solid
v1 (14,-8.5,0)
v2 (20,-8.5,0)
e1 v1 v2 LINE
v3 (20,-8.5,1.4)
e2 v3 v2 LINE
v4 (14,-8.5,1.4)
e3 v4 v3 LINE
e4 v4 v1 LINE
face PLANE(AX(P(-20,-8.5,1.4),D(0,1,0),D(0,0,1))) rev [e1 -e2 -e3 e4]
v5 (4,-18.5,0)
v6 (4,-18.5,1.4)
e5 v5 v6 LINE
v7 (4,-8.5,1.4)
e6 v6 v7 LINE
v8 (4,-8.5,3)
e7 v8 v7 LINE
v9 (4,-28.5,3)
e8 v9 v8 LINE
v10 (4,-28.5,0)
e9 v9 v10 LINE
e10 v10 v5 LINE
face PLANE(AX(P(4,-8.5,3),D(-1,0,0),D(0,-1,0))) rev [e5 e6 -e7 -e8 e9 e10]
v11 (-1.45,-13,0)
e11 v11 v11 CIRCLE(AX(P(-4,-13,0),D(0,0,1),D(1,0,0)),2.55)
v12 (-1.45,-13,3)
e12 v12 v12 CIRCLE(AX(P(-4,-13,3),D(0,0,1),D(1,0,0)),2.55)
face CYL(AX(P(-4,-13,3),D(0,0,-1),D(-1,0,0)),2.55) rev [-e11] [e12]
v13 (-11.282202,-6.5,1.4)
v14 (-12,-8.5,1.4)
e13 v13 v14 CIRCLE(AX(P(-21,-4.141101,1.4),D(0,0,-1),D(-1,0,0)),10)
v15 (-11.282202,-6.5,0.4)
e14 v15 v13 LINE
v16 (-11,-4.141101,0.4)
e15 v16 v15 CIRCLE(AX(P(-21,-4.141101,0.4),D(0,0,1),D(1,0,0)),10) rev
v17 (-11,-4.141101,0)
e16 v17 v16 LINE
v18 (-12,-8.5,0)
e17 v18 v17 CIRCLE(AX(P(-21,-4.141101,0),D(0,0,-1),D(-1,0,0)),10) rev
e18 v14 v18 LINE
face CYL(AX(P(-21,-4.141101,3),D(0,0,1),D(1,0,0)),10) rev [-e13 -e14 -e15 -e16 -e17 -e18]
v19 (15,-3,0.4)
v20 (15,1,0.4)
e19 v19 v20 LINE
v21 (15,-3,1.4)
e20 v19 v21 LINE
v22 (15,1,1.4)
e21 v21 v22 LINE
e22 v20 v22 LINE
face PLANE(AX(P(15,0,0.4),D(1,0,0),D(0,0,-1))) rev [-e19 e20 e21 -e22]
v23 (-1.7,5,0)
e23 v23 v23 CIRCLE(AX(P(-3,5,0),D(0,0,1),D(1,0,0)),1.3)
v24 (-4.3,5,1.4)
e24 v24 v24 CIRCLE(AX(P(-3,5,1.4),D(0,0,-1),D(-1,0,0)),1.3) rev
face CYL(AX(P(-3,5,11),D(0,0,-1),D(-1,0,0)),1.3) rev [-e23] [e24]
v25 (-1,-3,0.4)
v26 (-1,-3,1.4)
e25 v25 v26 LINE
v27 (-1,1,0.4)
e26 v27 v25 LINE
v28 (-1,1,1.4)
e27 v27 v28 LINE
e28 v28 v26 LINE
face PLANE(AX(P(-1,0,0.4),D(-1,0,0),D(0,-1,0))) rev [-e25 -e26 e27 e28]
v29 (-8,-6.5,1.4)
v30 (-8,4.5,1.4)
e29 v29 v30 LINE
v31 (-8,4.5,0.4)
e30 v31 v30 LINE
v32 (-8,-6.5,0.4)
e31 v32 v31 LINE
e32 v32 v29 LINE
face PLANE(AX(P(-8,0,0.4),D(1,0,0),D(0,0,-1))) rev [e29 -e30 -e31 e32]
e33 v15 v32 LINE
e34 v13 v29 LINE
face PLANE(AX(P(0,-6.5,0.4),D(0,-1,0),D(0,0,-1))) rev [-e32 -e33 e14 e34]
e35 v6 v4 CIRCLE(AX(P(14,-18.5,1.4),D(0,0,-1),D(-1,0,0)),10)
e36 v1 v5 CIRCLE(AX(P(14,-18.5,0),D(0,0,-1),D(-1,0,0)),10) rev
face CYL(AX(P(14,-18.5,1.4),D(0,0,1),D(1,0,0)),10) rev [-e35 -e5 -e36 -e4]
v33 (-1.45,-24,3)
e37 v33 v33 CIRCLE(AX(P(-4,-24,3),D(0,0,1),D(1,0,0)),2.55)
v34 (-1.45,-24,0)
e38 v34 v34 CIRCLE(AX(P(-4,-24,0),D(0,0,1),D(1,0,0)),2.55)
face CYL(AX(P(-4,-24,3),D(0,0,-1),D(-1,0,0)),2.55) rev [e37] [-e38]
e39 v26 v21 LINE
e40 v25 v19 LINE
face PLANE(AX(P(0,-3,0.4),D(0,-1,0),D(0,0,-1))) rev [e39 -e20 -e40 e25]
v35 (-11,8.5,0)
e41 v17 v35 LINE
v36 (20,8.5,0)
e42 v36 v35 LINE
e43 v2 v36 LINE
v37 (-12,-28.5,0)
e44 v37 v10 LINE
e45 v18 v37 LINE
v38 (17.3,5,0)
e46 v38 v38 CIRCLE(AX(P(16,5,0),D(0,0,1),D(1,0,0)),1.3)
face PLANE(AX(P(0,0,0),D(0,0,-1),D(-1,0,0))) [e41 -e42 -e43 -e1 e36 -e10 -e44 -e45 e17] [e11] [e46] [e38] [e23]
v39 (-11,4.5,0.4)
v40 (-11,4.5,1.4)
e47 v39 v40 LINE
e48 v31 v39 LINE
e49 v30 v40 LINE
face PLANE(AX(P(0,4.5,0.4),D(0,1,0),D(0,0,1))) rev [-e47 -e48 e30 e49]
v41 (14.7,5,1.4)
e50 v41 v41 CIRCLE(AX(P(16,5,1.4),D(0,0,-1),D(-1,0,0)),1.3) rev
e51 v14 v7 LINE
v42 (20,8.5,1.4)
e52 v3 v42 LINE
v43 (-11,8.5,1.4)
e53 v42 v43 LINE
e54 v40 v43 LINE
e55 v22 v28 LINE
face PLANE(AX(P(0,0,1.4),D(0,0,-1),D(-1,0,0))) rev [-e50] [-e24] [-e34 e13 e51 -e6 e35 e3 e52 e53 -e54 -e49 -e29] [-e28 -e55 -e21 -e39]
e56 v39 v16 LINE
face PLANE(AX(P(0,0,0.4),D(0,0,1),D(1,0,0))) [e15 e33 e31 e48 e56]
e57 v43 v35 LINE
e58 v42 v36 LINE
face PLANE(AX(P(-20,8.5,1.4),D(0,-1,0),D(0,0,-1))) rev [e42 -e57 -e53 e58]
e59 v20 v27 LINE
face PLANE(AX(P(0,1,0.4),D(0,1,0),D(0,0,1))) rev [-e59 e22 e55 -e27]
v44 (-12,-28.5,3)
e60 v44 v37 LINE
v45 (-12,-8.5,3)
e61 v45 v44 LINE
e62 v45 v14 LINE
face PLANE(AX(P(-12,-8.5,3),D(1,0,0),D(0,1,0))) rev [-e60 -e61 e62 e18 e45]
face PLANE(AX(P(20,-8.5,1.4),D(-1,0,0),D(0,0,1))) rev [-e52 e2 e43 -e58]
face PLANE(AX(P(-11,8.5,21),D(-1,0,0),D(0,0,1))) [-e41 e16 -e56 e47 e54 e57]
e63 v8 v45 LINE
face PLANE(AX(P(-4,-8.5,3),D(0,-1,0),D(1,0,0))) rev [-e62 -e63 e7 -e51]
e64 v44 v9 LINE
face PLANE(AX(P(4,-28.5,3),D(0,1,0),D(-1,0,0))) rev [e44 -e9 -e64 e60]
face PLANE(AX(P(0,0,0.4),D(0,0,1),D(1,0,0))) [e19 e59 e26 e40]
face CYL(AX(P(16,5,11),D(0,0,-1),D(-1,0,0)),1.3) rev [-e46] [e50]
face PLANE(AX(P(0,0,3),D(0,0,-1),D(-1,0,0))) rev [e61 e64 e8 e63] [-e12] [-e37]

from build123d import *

# Parameters (mm, degrees)
SKETCH1_W           = 40
SKETCH1_H           = 17
BOSS_EXTRUDE1_DEPTH = 1.4
CUT_EXTRUDE1_START  = 1.4
SKETCH3_W           = 16
SKETCH3_H           = 4
SKETCH3_W_2         = 3
SKETCH3_H_2         = 11
CUT_EXTRUDE1_DEPTH  = 1
SKETCH4_R           = 1.3
CUT_EXTRUDE2_DEPTH  = 11
SKETCH7_W           = 9
SKETCH7_H           = 17
CUT_EXTRUDE5_DEPTH  = 21
SKETCH9_R           = 2.55
BOSS_EXTRUDE3_DEPTH = 3
FILLET2_R           = 10


with BuildPart() as part:
    # Sketch1 → Boss-Extrude1 (new body)
    with BuildSketch(Plane.XY):
        Rectangle(SKETCH1_W, SKETCH1_H)
    extrude(amount=BOSS_EXTRUDE1_DEPTH)

    # Sketch3 → Cut-Extrude1 (cut)
    with BuildSketch(Plane.XY.offset(CUT_EXTRUDE1_START)):
        with Locations((7, -1)):
            Rectangle(SKETCH3_W, SKETCH3_H)
        with Locations((-9.5, -1)):
            Rectangle(SKETCH3_W_2, SKETCH3_H_2)
    extrude(amount=-CUT_EXTRUDE1_DEPTH, mode=Mode.SUBTRACT)

    # Sketch4 → Cut-Extrude2 (cut)
    with BuildSketch(Plane.XY):
        with Locations(Location((16, 5, 0), (0, 0, 180))):
            Circle(SKETCH4_R)
        with Locations(Location((-3, 5, 0), (0, 0, 180))):
            Circle(SKETCH4_R)
    extrude(amount=CUT_EXTRUDE2_DEPTH, mode=Mode.SUBTRACT)

    # Sketch7 → Cut-Extrude5 (cut)
    with BuildSketch(Plane.XY):
        with Locations((-15.5, 0)):
            Rectangle(SKETCH7_W, SKETCH7_H)
    extrude(amount=CUT_EXTRUDE5_DEPTH, mode=Mode.SUBTRACT)

    # Sketch9 → Boss-Extrude3 (add)
    with BuildSketch(Plane.XY):
        Polygon((-12, -8.5), (-12, -28.5), (4, -28.5), (4, -8.5), (-4, -8.5), align=None)
        with Locations((-4, -13)):
            Circle(SKETCH9_R, mode=Mode.SUBTRACT)
        with Locations((-4, -24)):
            Circle(SKETCH9_R, mode=Mode.SUBTRACT)
    extrude(amount=BOSS_EXTRUDE3_DEPTH)

    # Fillet2
    # the kernel refuses this fillet: 10 mm, written as the material it adds along each edge
    with BuildSketch(Plane(origin=(-11, -8.5, 0), x_dir=(0, 1, 0), z_dir=(0, 0, 1))) as fillet2_piece_1_section:
        with BuildLine():
            CenterArc((4.358898944, 10), FILLET2_R, 244.158067237, 25.841932763)
            Line((0, 1), (0, 0))
            Line((0, 0), (4.358898944, 0))
        make_face()
    fillet2_piece_1 = extrude(amount=12.297247359, mode=Mode.PRIVATE)
    fillet2_piece_1 = split(fillet2_piece_1, bisect_by=Plane(origin=(-11, -8.5, 0.4), z_dir=(0, 0, -1)), keep=Keep.TOP, mode=Mode.PRIVATE)
    add(fillet2_piece_1)
    with BuildSketch(Plane(origin=(-11, -8.5, -10.897247359), x_dir=(0, 1, 0), z_dir=(0, 0, 1))) as fillet2_piece_2_section:
        with BuildLine():
            CenterArc((4.358898944, 10), FILLET2_R, 244.158067237, 25.841932763)
            Line((0, 1), (0, 0))
            Line((0, 0), (4.358898944, 0))
        make_face()
    fillet2_piece_2 = extrude(amount=12.297247359, mode=Mode.PRIVATE)
    fillet2_piece_2 = split(fillet2_piece_2, bisect_by=Plane(origin=(-11, -6.5, -10.897247359), z_dir=(0, -1, 0)), keep=Keep.TOP, mode=Mode.PRIVATE)
    fillet2_piece_2 = split(fillet2_piece_2, bisect_by=Plane(origin=(-11, -8.5, 0.4), z_dir=(0, 0, 1)), keep=Keep.TOP, mode=Mode.PRIVATE)
    add(fillet2_piece_2)
    with BuildSketch(Plane(origin=(4, -8.5, 0), x_dir=(1, 0, 0), z_dir=(0, 0, 1))) as fillet2_piece_3:
        with BuildLine():
            CenterArc((FILLET2_R, -FILLET2_R), FILLET2_R, 90, 90)
            Line((0, -FILLET2_R), (0, 0))
            Line((0, 0), (FILLET2_R, 0))
        make_face()
    extrude(amount=1.4)


solid = part.part
